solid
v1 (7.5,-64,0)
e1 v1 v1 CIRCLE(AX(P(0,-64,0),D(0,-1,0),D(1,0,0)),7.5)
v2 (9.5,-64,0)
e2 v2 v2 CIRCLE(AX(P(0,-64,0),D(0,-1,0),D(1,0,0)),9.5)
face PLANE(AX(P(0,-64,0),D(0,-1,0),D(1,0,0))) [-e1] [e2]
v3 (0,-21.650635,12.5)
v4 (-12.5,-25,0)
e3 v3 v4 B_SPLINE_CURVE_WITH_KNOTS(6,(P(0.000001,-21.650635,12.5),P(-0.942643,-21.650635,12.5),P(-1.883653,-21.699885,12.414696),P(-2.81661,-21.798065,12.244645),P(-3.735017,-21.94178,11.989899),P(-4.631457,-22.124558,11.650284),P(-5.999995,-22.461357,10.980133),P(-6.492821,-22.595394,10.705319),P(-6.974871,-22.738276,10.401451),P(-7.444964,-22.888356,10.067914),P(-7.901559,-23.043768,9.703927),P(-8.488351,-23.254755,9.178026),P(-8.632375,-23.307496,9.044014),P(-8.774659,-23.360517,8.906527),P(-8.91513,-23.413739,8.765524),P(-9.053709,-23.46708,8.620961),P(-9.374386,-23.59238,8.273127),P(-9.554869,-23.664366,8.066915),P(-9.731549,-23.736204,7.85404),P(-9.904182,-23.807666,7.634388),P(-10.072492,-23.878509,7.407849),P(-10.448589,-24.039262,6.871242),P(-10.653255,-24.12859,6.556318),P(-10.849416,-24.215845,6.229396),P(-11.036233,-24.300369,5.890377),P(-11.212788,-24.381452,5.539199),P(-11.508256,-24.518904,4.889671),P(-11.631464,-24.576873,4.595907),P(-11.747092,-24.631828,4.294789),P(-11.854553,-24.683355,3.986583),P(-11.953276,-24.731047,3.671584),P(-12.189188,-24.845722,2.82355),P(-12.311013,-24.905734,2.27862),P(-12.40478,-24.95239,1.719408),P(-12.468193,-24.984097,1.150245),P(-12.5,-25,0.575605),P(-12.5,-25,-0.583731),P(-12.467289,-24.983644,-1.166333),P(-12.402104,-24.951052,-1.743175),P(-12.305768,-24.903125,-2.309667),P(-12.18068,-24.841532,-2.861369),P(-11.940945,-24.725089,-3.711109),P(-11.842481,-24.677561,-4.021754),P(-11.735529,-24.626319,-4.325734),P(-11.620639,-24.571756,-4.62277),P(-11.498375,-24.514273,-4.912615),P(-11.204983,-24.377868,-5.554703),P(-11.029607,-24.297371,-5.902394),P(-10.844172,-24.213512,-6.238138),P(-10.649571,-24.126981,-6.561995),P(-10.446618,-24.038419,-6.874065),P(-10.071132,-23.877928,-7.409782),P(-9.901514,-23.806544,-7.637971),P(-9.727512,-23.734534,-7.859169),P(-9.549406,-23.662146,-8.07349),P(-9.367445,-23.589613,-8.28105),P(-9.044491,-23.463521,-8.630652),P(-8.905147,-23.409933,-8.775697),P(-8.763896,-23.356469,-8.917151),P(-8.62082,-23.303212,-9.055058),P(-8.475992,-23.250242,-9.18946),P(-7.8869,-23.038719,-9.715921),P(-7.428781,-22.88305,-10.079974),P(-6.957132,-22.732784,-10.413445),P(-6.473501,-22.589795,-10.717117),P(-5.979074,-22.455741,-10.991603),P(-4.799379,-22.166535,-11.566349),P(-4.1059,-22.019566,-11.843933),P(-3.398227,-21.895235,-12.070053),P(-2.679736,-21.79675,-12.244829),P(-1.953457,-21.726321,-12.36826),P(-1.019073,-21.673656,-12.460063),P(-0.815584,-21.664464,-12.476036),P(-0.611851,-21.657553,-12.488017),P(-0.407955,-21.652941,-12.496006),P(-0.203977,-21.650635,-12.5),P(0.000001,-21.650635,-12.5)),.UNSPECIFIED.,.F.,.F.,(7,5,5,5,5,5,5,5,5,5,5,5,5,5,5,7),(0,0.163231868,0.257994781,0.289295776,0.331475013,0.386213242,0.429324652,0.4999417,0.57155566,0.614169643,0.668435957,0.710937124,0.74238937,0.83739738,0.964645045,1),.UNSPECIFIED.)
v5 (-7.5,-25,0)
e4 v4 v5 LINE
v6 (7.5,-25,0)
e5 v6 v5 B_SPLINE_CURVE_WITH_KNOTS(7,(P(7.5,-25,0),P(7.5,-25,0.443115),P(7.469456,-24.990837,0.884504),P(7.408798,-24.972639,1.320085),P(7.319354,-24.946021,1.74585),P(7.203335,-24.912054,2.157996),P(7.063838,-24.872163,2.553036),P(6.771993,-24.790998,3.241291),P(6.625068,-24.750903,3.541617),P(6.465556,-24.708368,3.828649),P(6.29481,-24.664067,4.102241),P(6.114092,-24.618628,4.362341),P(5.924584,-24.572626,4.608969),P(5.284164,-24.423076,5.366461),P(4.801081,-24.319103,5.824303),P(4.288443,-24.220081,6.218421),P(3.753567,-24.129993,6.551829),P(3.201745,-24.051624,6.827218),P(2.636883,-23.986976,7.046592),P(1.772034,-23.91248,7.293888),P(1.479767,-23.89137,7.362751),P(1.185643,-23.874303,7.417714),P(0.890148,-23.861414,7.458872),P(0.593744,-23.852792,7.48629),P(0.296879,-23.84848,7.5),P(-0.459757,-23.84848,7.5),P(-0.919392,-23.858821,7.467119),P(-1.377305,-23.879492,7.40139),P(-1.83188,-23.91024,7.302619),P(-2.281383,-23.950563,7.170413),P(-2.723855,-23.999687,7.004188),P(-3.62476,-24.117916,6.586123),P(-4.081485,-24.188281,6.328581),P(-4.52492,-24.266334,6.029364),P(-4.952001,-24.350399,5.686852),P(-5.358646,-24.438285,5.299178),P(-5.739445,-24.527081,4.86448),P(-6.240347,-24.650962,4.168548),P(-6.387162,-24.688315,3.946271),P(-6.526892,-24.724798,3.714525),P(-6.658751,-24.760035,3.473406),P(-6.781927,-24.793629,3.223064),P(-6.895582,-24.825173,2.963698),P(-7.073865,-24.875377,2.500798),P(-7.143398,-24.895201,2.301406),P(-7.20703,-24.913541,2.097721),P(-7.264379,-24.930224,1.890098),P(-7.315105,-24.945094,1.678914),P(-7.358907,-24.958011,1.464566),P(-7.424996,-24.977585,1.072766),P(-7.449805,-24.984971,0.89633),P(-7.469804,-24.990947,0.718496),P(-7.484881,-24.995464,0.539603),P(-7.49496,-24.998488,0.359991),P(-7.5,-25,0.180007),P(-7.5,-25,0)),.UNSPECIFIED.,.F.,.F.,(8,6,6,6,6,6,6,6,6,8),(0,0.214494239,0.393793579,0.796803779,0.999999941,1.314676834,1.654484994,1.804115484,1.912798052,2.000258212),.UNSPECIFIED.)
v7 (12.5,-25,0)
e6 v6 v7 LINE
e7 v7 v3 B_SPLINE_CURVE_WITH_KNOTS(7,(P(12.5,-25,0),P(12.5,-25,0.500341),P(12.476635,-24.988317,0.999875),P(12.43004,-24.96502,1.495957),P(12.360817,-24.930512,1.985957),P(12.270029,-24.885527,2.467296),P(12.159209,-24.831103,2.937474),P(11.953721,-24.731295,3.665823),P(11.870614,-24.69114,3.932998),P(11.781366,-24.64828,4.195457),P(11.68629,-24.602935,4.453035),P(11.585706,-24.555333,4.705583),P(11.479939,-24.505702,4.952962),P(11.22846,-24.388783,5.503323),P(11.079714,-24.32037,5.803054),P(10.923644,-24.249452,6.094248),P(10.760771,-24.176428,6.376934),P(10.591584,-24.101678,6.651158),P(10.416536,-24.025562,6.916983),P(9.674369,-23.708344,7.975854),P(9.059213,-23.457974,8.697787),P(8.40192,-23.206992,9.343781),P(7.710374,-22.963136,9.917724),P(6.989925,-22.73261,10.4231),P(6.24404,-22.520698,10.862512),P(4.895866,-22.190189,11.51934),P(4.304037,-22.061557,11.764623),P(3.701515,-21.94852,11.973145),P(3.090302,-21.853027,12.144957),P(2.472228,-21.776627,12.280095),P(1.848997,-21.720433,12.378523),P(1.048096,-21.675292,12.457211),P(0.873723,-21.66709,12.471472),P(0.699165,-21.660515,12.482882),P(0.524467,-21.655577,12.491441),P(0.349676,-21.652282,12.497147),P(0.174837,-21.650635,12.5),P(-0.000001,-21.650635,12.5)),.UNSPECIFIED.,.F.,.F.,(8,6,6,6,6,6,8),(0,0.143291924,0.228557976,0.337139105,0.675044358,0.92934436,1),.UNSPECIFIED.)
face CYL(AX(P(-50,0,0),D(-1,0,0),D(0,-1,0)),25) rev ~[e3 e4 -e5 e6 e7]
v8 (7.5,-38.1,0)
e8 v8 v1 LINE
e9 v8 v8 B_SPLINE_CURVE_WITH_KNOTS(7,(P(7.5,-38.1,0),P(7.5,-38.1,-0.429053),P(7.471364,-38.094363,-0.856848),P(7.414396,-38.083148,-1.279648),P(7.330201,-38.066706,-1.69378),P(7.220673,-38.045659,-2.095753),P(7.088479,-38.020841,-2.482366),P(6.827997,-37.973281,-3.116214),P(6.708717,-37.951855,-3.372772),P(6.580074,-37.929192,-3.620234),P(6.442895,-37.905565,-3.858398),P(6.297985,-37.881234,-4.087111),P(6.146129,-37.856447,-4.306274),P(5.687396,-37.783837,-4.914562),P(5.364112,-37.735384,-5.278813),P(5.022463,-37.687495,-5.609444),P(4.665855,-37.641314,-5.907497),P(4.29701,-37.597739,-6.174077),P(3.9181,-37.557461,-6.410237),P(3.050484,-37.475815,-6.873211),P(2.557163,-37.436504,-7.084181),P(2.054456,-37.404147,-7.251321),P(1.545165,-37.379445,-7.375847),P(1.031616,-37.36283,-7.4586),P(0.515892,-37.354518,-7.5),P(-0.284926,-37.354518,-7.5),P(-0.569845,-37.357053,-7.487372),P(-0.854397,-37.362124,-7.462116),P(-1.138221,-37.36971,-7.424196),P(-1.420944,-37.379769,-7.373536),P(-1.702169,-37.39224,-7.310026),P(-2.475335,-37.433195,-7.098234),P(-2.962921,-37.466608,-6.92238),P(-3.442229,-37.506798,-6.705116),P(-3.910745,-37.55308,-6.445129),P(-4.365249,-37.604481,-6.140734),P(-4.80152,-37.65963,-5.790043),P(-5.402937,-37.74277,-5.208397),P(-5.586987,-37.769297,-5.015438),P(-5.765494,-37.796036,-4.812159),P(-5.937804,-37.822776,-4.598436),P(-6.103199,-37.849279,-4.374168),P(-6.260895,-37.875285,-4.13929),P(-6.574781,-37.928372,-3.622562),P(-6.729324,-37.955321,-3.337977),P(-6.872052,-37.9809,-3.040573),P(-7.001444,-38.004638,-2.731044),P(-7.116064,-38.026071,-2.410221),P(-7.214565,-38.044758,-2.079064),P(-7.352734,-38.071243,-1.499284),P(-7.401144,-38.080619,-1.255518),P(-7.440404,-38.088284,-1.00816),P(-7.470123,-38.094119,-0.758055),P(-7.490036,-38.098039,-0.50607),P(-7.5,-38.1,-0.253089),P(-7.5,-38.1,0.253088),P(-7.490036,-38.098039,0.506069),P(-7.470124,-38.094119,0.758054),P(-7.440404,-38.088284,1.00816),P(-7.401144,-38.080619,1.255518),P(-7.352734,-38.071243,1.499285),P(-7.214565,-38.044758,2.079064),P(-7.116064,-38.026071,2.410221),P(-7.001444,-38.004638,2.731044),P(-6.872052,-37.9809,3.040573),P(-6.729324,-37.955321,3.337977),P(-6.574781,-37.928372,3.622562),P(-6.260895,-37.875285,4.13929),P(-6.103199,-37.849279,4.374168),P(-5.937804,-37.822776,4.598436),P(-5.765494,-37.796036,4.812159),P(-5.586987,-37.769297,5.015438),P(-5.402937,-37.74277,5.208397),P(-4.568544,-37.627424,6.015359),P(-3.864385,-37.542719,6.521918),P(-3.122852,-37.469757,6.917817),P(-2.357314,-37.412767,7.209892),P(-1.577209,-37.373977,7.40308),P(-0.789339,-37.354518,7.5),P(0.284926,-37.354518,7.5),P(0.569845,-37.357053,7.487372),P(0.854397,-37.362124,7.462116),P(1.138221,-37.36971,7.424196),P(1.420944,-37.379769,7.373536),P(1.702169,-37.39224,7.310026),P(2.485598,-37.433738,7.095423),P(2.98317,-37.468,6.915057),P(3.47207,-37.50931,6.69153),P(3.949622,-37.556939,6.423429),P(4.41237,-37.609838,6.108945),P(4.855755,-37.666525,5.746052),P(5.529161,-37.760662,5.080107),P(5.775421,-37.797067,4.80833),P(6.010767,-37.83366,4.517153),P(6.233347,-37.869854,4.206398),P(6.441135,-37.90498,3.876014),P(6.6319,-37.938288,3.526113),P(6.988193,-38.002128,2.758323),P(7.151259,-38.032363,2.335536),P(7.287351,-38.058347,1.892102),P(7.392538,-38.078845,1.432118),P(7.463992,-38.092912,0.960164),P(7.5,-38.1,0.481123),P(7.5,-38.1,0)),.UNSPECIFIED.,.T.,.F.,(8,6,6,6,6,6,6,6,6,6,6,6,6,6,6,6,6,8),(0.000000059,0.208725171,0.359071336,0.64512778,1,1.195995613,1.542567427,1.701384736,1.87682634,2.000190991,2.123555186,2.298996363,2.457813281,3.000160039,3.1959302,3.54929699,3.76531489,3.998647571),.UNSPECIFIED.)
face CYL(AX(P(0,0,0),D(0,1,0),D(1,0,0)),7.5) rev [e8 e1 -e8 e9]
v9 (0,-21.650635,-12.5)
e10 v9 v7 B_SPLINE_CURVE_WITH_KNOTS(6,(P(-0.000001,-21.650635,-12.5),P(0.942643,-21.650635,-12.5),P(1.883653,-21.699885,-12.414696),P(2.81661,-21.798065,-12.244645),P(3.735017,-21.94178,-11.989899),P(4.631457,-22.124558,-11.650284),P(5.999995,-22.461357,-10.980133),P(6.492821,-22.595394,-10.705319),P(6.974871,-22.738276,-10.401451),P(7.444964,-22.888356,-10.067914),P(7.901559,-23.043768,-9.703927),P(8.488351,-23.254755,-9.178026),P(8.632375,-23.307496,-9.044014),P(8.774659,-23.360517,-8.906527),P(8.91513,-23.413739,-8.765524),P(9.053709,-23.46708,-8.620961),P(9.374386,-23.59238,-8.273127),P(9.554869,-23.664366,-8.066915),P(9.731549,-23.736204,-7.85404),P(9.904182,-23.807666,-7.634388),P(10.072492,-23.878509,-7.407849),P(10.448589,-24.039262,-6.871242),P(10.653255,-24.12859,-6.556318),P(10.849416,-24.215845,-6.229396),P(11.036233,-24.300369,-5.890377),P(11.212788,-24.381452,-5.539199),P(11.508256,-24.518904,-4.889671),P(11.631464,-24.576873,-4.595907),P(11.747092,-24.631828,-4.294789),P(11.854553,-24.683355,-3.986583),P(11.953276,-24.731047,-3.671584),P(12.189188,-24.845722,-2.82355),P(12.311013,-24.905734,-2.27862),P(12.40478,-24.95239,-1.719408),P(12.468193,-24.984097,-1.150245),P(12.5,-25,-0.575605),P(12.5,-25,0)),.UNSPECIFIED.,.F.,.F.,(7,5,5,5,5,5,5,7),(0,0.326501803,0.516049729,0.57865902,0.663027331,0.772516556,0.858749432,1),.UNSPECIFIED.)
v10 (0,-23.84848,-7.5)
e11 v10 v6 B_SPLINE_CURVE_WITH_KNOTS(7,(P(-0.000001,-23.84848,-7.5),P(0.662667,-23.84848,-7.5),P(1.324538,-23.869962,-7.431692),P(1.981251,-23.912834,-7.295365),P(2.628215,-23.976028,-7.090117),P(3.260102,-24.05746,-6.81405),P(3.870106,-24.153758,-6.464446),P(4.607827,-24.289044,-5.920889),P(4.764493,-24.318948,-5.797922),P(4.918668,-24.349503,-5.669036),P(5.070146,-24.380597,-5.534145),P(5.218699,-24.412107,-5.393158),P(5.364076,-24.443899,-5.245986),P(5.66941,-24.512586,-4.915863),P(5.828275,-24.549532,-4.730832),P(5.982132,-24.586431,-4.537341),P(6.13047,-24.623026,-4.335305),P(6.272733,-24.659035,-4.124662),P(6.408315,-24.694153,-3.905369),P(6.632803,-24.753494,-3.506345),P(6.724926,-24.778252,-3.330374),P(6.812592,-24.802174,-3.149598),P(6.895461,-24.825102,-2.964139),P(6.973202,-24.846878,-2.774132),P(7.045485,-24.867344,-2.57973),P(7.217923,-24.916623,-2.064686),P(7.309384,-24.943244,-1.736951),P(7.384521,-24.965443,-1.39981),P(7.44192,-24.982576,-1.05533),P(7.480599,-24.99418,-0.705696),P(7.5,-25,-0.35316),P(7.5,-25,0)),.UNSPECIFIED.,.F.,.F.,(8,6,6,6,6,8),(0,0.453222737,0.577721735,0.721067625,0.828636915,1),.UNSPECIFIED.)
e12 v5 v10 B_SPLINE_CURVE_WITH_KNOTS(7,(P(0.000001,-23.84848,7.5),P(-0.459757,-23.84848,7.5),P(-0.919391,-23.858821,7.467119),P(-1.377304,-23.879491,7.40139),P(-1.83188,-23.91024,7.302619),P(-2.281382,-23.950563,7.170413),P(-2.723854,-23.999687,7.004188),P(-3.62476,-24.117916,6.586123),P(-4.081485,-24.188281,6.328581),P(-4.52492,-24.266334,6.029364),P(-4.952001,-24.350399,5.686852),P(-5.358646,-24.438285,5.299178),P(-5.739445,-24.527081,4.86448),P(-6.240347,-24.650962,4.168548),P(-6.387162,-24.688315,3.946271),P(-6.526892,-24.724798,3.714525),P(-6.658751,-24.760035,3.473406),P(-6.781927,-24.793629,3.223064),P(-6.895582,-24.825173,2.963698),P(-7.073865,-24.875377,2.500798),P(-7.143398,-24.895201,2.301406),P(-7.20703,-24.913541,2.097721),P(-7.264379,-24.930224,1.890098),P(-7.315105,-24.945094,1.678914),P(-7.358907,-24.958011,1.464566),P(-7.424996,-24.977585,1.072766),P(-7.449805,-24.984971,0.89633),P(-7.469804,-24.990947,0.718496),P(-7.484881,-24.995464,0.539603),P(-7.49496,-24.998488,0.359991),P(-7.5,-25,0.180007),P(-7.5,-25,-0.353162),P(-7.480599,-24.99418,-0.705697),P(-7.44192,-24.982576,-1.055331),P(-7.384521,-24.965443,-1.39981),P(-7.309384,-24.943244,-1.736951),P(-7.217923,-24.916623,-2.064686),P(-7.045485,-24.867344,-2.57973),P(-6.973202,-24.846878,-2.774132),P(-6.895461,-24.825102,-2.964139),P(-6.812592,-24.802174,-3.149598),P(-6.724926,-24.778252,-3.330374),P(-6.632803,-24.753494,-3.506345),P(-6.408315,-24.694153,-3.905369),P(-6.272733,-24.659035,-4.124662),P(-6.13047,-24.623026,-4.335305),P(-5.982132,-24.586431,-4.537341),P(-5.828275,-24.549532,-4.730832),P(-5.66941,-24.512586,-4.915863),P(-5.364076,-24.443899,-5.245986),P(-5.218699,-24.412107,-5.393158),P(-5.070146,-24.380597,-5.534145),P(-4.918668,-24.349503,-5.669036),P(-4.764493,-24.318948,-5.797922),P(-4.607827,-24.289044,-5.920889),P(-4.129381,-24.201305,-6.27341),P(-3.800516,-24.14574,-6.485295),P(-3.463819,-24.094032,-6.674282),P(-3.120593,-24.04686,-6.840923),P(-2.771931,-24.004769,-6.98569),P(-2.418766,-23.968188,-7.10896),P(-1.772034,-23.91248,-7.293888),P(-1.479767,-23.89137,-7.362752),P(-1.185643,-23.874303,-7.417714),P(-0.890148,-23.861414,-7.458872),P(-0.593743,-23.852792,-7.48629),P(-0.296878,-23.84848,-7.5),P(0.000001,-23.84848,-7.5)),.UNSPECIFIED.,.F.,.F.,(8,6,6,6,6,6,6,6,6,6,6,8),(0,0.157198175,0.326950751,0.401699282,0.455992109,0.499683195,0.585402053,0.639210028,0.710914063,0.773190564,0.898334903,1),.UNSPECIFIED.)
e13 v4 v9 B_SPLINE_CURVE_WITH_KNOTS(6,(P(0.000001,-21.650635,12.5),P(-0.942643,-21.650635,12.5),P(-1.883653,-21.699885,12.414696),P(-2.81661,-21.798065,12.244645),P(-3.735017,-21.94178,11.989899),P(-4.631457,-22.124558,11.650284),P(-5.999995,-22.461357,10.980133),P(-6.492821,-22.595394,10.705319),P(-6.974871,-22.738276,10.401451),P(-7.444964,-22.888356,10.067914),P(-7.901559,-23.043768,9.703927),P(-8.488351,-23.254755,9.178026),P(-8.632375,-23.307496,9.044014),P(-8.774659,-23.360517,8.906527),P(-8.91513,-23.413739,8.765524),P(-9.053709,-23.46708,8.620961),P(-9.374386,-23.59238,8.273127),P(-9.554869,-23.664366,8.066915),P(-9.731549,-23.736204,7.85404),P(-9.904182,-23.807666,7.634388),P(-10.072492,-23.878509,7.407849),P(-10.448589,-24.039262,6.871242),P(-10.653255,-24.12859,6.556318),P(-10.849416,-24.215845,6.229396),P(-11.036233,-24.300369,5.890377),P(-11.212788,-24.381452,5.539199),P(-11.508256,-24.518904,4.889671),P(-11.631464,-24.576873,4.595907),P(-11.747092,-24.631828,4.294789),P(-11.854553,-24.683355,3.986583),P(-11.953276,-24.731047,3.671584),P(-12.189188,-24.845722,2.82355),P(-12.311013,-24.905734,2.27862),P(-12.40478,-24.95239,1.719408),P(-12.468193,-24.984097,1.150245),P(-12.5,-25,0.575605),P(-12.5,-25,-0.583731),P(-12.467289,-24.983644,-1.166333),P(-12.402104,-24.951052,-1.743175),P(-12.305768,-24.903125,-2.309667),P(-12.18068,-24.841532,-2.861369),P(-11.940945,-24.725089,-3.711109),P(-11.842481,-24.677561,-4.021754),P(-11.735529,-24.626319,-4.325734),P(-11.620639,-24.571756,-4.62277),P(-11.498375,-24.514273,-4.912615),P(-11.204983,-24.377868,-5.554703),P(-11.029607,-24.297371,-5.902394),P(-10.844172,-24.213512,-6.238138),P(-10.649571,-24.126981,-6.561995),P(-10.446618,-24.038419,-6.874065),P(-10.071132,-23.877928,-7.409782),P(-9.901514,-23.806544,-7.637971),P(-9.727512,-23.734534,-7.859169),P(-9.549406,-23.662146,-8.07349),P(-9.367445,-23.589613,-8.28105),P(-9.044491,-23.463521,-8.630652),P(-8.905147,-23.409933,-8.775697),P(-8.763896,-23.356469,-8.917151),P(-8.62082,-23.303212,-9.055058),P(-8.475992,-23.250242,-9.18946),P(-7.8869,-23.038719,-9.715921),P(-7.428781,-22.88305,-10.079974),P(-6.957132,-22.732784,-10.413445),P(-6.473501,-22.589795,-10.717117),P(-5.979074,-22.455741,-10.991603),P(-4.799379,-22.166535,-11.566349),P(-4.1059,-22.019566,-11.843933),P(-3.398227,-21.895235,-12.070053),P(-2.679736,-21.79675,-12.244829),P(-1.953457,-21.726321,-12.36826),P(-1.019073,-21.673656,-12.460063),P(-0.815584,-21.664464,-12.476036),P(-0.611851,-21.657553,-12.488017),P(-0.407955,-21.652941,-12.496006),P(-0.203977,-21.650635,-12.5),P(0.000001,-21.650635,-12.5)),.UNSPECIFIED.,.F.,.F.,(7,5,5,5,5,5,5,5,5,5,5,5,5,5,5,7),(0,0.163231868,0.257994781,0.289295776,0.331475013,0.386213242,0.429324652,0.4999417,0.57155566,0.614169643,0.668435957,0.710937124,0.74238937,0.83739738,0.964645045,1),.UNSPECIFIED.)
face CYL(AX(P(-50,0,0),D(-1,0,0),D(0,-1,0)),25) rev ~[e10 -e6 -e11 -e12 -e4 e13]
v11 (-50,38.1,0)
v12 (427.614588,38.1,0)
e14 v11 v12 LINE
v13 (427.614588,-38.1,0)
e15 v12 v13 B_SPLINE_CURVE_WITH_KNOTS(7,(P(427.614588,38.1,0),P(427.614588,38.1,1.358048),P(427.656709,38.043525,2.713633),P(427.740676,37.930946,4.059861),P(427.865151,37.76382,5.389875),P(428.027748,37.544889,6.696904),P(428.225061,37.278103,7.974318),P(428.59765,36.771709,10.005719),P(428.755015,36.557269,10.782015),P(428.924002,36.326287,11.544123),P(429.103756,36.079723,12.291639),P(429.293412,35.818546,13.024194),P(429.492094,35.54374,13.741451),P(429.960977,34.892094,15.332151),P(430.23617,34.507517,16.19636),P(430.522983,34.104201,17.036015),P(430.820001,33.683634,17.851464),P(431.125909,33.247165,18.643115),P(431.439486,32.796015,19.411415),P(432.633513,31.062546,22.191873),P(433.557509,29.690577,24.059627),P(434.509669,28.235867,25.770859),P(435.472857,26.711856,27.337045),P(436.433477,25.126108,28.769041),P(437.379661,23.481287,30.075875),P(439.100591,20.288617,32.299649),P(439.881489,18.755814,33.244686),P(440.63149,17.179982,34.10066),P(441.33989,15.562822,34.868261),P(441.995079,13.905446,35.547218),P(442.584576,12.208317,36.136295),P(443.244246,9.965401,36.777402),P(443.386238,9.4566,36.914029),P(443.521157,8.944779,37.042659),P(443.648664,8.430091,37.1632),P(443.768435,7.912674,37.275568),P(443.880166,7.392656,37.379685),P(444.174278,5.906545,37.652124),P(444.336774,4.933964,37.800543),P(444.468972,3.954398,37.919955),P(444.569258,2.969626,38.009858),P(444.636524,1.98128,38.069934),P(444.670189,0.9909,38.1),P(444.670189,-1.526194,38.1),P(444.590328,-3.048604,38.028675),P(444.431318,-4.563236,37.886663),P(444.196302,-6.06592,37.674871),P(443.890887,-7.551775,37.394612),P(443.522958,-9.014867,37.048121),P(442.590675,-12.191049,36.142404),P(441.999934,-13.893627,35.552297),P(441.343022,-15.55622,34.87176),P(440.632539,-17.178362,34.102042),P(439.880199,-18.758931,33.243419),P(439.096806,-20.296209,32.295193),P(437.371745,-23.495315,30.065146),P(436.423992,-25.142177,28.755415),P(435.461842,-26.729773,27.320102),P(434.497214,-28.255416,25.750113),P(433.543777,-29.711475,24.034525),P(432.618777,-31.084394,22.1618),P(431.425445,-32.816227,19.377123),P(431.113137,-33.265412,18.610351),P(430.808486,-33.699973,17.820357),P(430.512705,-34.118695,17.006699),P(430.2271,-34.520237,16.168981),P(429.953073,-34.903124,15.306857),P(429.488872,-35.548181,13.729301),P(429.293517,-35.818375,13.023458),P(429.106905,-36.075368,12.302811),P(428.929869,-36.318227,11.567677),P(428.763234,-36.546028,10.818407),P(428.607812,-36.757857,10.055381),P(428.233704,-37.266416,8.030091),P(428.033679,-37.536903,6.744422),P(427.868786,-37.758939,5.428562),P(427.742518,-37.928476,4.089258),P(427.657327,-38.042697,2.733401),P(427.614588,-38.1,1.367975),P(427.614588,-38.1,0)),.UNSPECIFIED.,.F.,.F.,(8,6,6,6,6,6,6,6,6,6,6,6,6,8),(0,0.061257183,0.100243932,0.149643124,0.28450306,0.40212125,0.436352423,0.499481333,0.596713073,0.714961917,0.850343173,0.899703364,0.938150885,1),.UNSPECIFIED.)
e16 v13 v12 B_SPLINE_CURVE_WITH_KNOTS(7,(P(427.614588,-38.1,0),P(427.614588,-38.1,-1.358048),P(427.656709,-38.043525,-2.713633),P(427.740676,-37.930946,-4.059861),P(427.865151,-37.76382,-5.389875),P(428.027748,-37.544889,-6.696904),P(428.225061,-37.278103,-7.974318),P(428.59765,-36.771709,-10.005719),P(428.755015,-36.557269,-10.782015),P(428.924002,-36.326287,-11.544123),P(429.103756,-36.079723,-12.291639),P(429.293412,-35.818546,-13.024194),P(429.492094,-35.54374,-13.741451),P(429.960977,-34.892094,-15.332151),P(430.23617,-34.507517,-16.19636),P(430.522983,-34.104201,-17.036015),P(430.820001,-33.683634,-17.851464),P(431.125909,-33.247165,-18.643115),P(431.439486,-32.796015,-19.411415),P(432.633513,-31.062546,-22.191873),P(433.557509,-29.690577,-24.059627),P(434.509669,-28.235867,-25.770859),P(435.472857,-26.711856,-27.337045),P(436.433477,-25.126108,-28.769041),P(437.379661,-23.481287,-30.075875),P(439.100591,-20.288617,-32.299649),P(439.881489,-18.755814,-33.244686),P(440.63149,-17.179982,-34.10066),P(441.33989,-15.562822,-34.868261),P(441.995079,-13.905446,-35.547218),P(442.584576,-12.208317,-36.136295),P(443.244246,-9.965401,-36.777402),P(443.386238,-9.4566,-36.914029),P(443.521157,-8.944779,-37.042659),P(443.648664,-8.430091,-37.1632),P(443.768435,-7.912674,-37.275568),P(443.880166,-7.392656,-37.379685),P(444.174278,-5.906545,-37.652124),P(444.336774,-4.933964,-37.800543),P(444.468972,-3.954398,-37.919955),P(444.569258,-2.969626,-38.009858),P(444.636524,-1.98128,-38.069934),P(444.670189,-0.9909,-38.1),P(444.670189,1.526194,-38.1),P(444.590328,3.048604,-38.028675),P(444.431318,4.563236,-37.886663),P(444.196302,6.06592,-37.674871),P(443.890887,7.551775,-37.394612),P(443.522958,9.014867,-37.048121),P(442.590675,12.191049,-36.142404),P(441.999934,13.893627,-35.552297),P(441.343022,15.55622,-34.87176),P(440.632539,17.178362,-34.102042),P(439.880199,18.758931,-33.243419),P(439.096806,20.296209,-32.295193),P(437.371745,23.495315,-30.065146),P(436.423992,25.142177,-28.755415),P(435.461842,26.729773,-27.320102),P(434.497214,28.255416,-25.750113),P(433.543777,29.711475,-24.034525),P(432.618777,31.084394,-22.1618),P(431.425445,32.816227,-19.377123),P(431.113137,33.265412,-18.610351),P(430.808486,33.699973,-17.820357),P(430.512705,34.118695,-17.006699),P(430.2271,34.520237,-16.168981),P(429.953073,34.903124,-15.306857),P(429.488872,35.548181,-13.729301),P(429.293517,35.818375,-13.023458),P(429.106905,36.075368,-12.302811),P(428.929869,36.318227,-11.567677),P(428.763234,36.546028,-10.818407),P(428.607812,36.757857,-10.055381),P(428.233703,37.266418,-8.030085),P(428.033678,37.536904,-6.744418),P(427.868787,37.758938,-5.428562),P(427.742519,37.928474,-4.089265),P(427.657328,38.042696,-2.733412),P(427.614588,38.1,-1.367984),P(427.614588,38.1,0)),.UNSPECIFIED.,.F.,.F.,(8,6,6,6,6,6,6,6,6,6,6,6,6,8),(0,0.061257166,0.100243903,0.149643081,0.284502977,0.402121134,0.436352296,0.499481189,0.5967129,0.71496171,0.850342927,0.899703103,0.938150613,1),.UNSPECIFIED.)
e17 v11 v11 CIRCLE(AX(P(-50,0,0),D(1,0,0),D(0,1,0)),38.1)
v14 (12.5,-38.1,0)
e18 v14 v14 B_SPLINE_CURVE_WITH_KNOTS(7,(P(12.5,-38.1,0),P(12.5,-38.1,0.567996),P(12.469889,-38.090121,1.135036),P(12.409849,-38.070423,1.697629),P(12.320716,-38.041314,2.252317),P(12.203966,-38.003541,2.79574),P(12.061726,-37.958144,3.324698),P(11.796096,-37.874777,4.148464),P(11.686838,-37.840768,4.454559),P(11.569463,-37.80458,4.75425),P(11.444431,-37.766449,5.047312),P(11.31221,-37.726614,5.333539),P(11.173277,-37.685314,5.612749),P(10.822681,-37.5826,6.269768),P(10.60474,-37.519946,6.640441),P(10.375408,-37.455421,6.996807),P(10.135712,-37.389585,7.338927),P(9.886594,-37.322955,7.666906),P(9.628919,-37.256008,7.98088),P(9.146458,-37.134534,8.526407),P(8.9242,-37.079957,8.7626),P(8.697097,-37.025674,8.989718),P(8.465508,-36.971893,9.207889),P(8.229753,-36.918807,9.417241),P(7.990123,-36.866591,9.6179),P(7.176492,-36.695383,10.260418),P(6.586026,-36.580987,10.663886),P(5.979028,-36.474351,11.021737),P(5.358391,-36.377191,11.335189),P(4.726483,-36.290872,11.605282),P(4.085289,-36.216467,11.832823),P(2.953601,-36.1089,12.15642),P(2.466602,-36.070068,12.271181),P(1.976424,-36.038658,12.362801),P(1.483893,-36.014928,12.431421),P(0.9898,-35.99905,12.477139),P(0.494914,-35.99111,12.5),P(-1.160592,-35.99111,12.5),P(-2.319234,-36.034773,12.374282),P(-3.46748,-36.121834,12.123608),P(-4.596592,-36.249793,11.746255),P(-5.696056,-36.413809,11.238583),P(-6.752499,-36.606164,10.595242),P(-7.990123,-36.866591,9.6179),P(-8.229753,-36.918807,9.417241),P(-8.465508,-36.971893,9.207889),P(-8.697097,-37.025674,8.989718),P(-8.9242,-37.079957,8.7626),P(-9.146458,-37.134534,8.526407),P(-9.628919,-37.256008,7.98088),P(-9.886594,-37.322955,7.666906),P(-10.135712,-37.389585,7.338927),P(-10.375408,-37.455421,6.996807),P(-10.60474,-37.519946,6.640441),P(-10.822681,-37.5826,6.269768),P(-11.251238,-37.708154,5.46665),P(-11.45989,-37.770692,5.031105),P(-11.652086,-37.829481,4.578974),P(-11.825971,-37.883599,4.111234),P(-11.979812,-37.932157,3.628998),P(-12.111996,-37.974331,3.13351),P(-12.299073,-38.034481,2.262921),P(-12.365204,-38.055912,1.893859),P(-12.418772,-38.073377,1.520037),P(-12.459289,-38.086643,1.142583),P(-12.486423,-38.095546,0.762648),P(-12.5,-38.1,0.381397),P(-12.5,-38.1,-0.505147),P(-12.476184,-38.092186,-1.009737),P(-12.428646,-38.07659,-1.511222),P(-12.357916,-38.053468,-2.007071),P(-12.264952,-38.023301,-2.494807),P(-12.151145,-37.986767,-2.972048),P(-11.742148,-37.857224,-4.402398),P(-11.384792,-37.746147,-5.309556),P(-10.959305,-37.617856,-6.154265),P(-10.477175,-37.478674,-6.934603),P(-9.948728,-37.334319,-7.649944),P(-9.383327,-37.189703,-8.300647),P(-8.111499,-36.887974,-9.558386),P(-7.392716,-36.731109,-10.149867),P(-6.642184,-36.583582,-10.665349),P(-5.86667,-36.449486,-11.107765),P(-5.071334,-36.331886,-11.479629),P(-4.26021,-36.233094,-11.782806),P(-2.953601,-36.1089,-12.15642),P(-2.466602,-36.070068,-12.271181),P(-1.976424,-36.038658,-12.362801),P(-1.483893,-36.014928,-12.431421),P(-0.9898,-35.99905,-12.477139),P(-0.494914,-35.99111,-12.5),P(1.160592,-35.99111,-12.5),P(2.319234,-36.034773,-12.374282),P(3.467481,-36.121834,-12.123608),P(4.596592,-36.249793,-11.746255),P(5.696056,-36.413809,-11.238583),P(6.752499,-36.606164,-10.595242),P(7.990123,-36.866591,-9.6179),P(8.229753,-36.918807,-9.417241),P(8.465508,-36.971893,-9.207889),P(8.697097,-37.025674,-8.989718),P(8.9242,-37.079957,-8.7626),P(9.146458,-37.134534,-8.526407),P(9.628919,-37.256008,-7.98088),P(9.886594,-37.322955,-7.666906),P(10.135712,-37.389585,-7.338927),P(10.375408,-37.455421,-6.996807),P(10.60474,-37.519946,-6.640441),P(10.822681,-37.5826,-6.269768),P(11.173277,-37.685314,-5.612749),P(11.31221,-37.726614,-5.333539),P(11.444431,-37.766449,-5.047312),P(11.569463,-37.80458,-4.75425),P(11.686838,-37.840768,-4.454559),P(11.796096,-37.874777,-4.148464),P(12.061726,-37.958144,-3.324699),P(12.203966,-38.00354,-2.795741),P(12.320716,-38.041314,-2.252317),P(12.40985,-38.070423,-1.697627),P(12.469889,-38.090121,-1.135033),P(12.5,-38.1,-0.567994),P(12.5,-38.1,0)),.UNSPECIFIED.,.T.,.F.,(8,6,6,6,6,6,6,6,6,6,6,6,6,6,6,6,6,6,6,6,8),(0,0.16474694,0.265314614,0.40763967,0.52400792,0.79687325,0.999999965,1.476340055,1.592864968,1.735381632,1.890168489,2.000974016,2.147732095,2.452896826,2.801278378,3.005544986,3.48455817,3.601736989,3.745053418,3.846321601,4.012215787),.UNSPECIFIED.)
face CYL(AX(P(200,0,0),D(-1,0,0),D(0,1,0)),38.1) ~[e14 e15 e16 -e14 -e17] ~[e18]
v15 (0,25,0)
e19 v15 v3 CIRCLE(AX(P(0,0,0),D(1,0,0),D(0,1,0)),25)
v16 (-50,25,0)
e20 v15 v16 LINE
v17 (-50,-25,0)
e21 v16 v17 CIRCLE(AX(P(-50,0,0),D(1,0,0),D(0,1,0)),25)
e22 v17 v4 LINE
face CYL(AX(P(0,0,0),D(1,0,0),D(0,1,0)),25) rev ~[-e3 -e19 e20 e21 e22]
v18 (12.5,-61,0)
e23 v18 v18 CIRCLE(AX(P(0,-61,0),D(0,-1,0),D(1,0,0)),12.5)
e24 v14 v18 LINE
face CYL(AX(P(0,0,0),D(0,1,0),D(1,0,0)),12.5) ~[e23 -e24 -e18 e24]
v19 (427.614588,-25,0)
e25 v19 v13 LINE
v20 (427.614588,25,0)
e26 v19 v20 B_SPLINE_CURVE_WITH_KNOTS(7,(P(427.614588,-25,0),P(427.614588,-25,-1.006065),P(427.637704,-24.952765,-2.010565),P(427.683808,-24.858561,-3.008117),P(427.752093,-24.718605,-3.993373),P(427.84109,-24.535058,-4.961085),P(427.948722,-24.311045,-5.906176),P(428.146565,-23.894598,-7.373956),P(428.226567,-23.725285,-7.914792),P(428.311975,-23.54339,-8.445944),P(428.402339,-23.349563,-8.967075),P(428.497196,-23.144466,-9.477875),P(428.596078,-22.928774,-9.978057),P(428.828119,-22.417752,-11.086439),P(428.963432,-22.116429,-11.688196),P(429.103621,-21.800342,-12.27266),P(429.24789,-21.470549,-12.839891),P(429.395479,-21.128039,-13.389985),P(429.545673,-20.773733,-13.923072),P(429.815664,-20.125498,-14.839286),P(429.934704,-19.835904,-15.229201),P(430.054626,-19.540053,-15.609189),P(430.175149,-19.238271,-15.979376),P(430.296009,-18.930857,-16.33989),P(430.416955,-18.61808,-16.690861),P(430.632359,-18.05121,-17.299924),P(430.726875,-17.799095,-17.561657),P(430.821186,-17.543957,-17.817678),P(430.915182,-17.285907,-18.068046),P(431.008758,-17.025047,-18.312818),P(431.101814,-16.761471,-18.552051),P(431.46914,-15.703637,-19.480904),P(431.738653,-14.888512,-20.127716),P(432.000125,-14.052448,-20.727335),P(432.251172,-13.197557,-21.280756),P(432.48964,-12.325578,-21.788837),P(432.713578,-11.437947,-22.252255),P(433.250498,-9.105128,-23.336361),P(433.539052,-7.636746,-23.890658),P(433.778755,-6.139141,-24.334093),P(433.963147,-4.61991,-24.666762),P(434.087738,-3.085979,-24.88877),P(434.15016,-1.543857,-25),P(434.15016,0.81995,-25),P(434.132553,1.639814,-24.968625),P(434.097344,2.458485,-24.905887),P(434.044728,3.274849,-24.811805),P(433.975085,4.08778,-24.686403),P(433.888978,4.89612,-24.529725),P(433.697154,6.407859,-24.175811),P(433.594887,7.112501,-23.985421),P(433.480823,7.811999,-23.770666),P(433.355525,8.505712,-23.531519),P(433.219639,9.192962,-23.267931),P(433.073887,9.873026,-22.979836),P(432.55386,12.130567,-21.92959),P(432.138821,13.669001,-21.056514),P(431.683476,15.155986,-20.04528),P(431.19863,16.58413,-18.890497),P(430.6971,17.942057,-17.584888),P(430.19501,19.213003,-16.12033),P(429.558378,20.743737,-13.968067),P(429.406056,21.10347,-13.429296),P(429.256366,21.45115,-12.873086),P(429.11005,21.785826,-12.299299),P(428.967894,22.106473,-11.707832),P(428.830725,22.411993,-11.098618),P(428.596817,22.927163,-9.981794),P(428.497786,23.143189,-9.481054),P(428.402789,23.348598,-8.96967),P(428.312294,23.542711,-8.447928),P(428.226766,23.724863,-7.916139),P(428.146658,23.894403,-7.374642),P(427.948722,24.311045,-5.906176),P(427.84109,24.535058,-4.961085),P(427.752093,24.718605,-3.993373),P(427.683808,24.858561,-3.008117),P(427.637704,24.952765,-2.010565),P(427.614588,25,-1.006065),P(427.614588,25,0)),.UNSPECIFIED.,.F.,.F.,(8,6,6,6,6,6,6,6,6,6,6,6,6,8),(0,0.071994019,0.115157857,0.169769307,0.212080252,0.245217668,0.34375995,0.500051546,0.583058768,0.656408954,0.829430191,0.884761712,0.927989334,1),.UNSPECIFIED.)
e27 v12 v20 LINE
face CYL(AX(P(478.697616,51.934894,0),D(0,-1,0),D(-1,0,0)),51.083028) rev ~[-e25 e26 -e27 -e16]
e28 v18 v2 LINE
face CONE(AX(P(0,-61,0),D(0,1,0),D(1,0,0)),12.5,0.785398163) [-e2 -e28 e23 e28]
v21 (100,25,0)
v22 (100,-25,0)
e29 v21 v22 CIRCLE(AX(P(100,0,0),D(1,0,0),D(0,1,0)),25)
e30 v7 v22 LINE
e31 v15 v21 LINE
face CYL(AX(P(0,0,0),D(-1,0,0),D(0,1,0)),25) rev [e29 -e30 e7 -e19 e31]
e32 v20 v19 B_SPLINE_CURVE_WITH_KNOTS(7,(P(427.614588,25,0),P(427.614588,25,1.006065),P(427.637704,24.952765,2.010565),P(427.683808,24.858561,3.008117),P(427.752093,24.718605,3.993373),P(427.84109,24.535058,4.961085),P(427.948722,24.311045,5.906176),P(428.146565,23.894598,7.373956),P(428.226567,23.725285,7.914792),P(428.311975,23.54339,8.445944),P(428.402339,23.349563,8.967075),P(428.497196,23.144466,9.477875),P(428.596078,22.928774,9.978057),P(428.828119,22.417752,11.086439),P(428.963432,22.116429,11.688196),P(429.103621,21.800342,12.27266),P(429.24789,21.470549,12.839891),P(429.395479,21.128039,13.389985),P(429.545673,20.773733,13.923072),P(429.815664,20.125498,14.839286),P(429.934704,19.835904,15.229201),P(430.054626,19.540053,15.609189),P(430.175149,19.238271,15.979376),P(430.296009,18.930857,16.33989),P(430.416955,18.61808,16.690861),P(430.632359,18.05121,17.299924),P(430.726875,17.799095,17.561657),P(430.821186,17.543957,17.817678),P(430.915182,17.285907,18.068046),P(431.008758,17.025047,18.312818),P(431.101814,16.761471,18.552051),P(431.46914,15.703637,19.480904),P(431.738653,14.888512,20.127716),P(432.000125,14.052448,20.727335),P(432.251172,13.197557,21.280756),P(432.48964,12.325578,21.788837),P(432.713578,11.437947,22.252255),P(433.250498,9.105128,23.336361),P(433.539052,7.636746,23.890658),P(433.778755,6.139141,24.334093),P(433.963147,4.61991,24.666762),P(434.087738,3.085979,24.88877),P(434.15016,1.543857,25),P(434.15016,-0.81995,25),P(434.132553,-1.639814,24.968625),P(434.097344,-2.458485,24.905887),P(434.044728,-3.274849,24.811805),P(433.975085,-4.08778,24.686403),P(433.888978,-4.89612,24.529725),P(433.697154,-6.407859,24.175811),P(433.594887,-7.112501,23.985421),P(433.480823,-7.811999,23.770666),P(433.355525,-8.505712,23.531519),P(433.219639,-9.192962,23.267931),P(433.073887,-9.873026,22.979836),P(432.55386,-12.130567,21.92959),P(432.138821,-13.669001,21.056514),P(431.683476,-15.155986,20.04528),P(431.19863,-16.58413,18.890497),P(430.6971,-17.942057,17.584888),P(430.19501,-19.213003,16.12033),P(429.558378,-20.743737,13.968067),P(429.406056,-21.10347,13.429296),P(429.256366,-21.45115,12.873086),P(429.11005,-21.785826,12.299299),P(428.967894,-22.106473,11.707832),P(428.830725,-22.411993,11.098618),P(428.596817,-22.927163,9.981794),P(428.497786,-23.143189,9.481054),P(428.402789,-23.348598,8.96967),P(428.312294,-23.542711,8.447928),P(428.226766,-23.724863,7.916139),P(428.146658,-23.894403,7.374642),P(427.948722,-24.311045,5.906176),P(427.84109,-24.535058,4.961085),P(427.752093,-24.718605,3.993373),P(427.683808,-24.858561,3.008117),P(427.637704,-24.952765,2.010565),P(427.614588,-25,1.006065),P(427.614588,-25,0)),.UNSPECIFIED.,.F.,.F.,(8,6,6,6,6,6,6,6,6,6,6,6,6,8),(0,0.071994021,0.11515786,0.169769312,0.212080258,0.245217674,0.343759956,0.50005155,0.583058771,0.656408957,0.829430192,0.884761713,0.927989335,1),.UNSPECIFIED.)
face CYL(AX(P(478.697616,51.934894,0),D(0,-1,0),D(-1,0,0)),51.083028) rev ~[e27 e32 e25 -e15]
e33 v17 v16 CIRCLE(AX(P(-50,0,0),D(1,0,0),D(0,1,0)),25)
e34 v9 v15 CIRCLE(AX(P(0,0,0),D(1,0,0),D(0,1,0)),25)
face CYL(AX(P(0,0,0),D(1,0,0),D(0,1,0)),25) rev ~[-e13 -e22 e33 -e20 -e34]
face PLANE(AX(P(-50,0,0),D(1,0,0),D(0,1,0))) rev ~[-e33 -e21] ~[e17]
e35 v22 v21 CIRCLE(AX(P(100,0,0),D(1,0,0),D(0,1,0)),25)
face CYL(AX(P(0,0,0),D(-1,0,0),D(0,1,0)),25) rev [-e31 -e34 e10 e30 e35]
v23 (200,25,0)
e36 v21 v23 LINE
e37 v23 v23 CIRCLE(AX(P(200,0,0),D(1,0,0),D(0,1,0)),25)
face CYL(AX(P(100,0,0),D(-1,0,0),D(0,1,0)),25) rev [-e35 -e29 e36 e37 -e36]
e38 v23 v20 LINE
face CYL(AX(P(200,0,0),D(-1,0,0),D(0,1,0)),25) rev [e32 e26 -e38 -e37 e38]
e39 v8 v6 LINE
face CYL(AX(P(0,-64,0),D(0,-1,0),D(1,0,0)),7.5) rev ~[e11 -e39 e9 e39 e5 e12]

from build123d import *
from build123d import SkipClean  # not in build123d's __all__

# Parameters (mm, degrees)
F0_R      = 12.5
F0_R_2    = 7.5
F1_DEPTH  = 64
F2_R      = 38.1
F2_R_2    = 25
F3_DEPTH  = 100
F4_DEPTH  = 50
F5_SIZE   = 3
F6_R      = 25
F7_DEPTH  = 200
F8_R      = 7.5
F9_DEPTH  = 50
F10_DEPTH = 100
F11_R     = 7.5
F12_DEPTH = 50
F13_DEPTH = 250


with BuildPart() as f1:
    # F0 (on Front) → F1 (new body)
    with BuildSketch(Plane.XZ):
        Circle(F0_R)
        Circle(F0_R_2, mode=Mode.SUBTRACT)
    extrude(amount=F1_DEPTH)

    # F2 (on Right) → F3 (join)
    with BuildSketch(Plane.YZ):
        Circle(F2_R)
        Circle(F2_R_2, mode=Mode.SUBTRACT)
    extrude(amount=F3_DEPTH)

    # F2 (on Right) → F4 (join)
    with BuildSketch(Plane.YZ):
        Circle(F2_R)
        Circle(F2_R_2, mode=Mode.SUBTRACT)
    extrude(amount=-F4_DEPTH)

    # F5
    f5_edges = [f1.edges().sort_by_distance(p)[0] for p in [
        (-12.5, -64, 0),
    ]]
    chamfer(f5_edges, length=F5_SIZE)

    # F6 (on face) → F7 (cut)
    with BuildSketch(Plane(origin=(-50, 0, 0), x_dir=(0, -1, 0), z_dir=(-1, 0, 0))):
        Circle(F6_R)
    extrude(amount=-F7_DEPTH, mode=Mode.SUBTRACT)

    # F8 (on face) → F9 (cut)
    with BuildSketch(Plane.XZ.offset(64)):
        Circle(F8_R)
    extrude(amount=-F9_DEPTH, mode=Mode.SUBTRACT)

    # F10 (add): a face of the model
    f10_faces = [f1.faces().sort_by_distance(p)[0] for p in [
        (100, -37.0223692655, 0),
    ]]
    with SkipClean():  # cleaning this boolean's faces spoils the solid; the shape is the same uncleaned
        extrude(f10_faces, amount=F10_DEPTH)

    # F11 (on face) → F12 (cut)
    with BuildSketch(Plane.XZ.offset(64)):
        Circle(F11_R)
    with SkipClean():  # cleaning this boolean's faces spoils the solid; the shape is the same uncleaned
        extrude(amount=-F12_DEPTH, mode=Mode.SUBTRACT)

    # F13 (add): a face of the model
    f13_faces = [f1.faces().sort_by_distance(p)[0] for p in [
        (200, -37.0223692655, 0),
    ]]
    extrude(f13_faces, amount=F13_DEPTH)

    # F14 (on Top) → F15 (revolve, cut)
    with BuildSketch(Plane.XY):
        Polygon((455.1408666709, 52.4849742776), (427.6145875454, 51.9348941743), (427.6145875454, -50.6588555872), (455.1408666709, -51.4342445287), align=None)
    with SkipClean():  # cleaning this boolean's faces spoils the solid; the shape is the same uncleaned
        revolve(axis=Axis((478.6976158619, 0.4289562068, 0), (0, -1, 0)), mode=Mode.SUBTRACT)


solid = f1.part
